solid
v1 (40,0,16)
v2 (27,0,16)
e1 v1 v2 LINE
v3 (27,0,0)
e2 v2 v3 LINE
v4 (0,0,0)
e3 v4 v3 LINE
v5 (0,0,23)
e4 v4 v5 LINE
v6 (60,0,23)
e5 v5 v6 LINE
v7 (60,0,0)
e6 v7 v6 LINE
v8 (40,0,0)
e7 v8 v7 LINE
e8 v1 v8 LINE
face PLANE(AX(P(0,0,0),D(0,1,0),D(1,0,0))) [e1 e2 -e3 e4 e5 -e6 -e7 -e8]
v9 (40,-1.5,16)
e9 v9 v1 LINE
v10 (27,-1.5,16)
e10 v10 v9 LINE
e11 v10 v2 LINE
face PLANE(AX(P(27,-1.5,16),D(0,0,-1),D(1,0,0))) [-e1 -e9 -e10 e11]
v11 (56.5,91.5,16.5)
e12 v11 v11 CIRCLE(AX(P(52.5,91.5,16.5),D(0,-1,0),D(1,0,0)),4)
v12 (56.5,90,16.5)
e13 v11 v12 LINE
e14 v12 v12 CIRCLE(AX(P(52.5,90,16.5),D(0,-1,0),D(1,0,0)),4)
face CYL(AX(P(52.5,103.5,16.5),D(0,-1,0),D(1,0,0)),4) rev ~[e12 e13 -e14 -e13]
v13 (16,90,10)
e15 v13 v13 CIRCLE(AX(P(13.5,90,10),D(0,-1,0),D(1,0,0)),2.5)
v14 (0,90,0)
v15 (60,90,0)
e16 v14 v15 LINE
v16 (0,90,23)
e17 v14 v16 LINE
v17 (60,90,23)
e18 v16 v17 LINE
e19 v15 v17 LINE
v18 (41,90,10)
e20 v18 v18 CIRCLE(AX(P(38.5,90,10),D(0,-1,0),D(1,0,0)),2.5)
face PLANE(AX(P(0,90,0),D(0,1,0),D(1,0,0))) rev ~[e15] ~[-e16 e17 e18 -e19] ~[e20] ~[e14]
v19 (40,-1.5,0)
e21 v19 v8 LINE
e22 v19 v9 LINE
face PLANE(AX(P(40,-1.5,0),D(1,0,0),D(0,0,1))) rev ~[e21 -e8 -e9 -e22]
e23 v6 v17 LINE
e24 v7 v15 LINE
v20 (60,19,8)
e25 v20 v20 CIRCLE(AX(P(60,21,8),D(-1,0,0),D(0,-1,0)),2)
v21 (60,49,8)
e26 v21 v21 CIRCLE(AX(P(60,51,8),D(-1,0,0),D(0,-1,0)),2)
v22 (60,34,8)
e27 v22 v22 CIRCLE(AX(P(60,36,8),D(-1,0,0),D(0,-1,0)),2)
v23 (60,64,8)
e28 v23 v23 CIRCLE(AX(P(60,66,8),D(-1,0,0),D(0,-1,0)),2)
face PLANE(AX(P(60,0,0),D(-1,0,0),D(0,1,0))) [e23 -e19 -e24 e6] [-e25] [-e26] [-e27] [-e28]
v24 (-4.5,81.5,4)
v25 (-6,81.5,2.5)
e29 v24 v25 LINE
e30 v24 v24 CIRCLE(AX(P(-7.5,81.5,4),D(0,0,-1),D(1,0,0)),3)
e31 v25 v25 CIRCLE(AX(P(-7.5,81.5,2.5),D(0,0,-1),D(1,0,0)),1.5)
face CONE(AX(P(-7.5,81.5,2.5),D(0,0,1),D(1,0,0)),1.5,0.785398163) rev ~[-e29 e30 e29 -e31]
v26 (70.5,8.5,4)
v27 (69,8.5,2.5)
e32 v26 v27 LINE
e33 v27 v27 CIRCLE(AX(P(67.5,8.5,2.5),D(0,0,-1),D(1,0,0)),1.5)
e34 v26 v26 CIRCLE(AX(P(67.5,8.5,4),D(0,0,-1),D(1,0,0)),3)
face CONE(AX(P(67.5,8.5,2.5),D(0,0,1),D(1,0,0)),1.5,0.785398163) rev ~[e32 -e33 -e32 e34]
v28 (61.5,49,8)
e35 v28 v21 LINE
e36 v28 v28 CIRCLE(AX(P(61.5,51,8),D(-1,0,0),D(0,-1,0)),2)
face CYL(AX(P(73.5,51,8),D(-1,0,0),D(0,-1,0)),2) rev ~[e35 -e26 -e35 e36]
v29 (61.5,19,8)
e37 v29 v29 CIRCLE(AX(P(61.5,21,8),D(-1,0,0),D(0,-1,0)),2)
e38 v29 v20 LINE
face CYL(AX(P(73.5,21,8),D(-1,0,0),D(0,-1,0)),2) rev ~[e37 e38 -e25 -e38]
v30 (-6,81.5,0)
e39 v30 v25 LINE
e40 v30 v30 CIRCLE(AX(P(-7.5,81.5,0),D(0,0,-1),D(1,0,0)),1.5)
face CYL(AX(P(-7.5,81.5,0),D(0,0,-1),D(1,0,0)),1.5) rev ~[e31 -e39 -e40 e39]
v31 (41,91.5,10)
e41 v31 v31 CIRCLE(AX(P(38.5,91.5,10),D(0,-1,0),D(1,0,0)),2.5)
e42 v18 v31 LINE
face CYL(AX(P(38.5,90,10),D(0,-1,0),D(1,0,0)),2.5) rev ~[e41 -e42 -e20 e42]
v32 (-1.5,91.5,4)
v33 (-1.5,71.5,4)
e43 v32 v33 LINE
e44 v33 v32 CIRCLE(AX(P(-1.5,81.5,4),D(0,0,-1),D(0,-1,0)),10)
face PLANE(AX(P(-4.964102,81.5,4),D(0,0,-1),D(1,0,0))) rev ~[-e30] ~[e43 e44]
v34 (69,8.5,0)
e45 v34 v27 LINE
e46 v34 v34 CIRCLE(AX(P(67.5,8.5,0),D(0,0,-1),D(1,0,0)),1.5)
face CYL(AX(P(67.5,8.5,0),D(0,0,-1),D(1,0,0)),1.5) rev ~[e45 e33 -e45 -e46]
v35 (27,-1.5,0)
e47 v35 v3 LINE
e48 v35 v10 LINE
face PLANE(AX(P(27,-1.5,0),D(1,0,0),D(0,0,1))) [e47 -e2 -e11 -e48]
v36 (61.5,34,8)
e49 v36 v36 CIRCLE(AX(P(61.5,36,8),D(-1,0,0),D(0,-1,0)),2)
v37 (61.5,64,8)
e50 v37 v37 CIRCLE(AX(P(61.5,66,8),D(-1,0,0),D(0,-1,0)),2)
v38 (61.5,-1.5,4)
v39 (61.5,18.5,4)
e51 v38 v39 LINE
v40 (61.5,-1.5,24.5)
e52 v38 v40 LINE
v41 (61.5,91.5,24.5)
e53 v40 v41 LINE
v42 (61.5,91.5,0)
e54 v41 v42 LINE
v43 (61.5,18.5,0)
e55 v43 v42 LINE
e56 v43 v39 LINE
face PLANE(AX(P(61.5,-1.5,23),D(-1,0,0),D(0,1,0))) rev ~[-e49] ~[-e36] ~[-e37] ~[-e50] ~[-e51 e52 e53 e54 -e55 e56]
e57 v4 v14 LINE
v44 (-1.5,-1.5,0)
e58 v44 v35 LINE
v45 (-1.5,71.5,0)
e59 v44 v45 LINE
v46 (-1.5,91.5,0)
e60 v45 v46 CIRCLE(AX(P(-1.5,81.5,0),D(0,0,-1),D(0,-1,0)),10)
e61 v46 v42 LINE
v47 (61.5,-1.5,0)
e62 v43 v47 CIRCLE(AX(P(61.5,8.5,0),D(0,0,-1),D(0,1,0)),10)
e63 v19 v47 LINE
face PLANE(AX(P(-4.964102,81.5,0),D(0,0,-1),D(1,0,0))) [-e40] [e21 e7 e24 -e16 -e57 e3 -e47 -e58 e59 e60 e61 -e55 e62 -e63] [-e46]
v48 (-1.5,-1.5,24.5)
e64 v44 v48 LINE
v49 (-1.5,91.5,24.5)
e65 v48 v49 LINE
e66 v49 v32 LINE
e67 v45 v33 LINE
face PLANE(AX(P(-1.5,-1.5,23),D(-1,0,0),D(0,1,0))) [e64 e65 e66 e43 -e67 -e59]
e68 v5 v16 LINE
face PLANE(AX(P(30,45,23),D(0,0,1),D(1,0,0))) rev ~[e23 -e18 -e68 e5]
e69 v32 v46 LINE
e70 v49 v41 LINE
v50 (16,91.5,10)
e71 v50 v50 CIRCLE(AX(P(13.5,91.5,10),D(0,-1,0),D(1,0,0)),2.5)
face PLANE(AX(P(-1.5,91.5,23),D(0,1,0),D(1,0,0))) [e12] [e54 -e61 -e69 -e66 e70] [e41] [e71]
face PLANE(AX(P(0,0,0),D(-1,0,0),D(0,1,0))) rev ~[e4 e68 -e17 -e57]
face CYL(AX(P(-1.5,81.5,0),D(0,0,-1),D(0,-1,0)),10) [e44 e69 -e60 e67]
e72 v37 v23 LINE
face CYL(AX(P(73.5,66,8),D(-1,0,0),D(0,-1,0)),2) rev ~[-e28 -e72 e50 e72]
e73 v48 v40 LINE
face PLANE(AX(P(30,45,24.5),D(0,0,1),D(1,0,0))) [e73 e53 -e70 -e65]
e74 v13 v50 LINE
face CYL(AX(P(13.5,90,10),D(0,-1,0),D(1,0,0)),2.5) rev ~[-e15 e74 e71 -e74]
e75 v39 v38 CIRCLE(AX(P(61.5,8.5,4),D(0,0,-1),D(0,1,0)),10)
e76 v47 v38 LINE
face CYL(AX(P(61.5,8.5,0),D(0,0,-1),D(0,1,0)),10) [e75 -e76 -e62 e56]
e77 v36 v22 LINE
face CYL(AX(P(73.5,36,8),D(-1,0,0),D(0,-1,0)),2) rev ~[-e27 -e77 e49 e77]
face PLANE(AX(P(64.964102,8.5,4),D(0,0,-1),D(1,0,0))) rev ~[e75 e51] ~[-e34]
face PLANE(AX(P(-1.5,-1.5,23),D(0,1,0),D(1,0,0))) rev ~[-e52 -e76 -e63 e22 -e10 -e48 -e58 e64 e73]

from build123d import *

# Parameters (mm, degrees)
F0_W      = 63
F0_H      = 93
F0_W_2    = 60
F0_H_2    = 90
F1_DEPTH  = 23
F2_W      = 13
F2_H      = 16
F3_DEPTH  = 25
F5_D      = 4
F5_DEPTH  = 12
F5_TIP    = 1.2017212381
F7_D      = 5
F7_DEPTH  = 12
F7_TIP    = 1.5021515476
F9_D      = 8
F9_DEPTH  = 12
F9_TIP    = 2.4034424761
F10_W     = 63
F10_H     = 93
F11_DEPTH = 1.5
F12_R     = 1.5
F13_DEPTH = 4
F14_SIZE  = 1.5


# Not quite as in the source:
# - a feature names something its author has since deleted; it is built from what else it names


with BuildPart() as f1:
    # F0 (on Top) → F1 (new body)
    with BuildSketch(Plane.XY):
        with Locations((30, 45)):
            Rectangle(F0_W, F0_H)
        with Locations((30, 45)):
            Rectangle(F0_W_2, F0_H_2, mode=Mode.SUBTRACT)
    extrude(amount=F1_DEPTH)

    # F2 (on face) → F3 (cut)
    with BuildSketch(Plane.XZ.offset(1.5)):
        with Locations((33.5, 8)):
            Rectangle(F2_W, F2_H)
    extrude(amount=-F3_DEPTH, mode=Mode.SUBTRACT)

    # F5
    with Locations(Plane.YZ.offset(61.5)):
        with Locations((51, 8), (66, 8), (36, 8), (21, 8)):
            Hole(F5_D / 2, depth=F5_DEPTH)
            with Locations((0, 0, -(F5_DEPTH + F5_TIP / 2))):  # 118° drill point
                Cone(0, F5_D / 2, F5_TIP, mode=Mode.SUBTRACT)

    # F7 (one way)
    with BuildSketch(Plane.XZ.offset(-90)):
        with Locations((13.5, 10), (38.5, 10)):
            Circle(F7_D / 2)
    extrude(amount=-F7_DEPTH, mode=Mode.SUBTRACT)
    with Locations(Plane.XZ.offset(-90)):
        with Locations((13.5, 10), (38.5, 10)):
            with Locations((0, 0, -(F7_DEPTH + F7_TIP / 2))):  # 118° drill point
                Cone(0, F7_D / 2, F7_TIP, mode=Mode.SUBTRACT)

    # F9
    with Locations(Plane(origin=(0, 91.5, 0), x_dir=(-1, 0, 0), z_dir=(0, 1, 0))):
        with Locations((-52.5, 16.5)):
            Hole(F9_D / 2, depth=F9_DEPTH)
            with Locations((0, 0, -(F9_DEPTH + F9_TIP / 2))):  # 118° drill point
                Cone(0, F9_D / 2, F9_TIP, mode=Mode.SUBTRACT)

    # F10 (on face) → F11 (join)
    with BuildSketch(Plane.XY.offset(23)):
        with Locations((30, 45)):
            Rectangle(F10_W, F10_H)
    extrude(amount=F11_DEPTH)

    # F12 (on face) → F13 (join)
    with BuildSketch(Plane(origin=(0, 0, 0), x_dir=(1, 0, 0), z_dir=(0, 0, -1))):
        with BuildLine():
            ThreePointArc((-1.5, -71.5), (-11.5, -81.5), (-1.5, -91.5))
            Line((-1.5, -91.5), (-1.5, -71.5))
        make_face()
        with Locations((-7.5, -81.5)):
            Circle(F12_R, mode=Mode.SUBTRACT)
        with BuildLine():
            Line((61.5, 1.5), (61.5, -18.5))
            ThreePointArc((61.5, -18.5), (71.5, -8.5), (61.5, 1.5))
        make_face()
        with Locations((67.5, -8.5)):
            Circle(F12_R, mode=Mode.SUBTRACT)
    extrude(amount=-F13_DEPTH)

    # F14
    f14_edges = [f1.edges().sort_by_distance(p)[0] for p in [
        (-9, 81.5, 4),
        (66, 8.5, 4),
    ]]
    chamfer(f14_edges, length=F14_SIZE)


solid = f1.part
